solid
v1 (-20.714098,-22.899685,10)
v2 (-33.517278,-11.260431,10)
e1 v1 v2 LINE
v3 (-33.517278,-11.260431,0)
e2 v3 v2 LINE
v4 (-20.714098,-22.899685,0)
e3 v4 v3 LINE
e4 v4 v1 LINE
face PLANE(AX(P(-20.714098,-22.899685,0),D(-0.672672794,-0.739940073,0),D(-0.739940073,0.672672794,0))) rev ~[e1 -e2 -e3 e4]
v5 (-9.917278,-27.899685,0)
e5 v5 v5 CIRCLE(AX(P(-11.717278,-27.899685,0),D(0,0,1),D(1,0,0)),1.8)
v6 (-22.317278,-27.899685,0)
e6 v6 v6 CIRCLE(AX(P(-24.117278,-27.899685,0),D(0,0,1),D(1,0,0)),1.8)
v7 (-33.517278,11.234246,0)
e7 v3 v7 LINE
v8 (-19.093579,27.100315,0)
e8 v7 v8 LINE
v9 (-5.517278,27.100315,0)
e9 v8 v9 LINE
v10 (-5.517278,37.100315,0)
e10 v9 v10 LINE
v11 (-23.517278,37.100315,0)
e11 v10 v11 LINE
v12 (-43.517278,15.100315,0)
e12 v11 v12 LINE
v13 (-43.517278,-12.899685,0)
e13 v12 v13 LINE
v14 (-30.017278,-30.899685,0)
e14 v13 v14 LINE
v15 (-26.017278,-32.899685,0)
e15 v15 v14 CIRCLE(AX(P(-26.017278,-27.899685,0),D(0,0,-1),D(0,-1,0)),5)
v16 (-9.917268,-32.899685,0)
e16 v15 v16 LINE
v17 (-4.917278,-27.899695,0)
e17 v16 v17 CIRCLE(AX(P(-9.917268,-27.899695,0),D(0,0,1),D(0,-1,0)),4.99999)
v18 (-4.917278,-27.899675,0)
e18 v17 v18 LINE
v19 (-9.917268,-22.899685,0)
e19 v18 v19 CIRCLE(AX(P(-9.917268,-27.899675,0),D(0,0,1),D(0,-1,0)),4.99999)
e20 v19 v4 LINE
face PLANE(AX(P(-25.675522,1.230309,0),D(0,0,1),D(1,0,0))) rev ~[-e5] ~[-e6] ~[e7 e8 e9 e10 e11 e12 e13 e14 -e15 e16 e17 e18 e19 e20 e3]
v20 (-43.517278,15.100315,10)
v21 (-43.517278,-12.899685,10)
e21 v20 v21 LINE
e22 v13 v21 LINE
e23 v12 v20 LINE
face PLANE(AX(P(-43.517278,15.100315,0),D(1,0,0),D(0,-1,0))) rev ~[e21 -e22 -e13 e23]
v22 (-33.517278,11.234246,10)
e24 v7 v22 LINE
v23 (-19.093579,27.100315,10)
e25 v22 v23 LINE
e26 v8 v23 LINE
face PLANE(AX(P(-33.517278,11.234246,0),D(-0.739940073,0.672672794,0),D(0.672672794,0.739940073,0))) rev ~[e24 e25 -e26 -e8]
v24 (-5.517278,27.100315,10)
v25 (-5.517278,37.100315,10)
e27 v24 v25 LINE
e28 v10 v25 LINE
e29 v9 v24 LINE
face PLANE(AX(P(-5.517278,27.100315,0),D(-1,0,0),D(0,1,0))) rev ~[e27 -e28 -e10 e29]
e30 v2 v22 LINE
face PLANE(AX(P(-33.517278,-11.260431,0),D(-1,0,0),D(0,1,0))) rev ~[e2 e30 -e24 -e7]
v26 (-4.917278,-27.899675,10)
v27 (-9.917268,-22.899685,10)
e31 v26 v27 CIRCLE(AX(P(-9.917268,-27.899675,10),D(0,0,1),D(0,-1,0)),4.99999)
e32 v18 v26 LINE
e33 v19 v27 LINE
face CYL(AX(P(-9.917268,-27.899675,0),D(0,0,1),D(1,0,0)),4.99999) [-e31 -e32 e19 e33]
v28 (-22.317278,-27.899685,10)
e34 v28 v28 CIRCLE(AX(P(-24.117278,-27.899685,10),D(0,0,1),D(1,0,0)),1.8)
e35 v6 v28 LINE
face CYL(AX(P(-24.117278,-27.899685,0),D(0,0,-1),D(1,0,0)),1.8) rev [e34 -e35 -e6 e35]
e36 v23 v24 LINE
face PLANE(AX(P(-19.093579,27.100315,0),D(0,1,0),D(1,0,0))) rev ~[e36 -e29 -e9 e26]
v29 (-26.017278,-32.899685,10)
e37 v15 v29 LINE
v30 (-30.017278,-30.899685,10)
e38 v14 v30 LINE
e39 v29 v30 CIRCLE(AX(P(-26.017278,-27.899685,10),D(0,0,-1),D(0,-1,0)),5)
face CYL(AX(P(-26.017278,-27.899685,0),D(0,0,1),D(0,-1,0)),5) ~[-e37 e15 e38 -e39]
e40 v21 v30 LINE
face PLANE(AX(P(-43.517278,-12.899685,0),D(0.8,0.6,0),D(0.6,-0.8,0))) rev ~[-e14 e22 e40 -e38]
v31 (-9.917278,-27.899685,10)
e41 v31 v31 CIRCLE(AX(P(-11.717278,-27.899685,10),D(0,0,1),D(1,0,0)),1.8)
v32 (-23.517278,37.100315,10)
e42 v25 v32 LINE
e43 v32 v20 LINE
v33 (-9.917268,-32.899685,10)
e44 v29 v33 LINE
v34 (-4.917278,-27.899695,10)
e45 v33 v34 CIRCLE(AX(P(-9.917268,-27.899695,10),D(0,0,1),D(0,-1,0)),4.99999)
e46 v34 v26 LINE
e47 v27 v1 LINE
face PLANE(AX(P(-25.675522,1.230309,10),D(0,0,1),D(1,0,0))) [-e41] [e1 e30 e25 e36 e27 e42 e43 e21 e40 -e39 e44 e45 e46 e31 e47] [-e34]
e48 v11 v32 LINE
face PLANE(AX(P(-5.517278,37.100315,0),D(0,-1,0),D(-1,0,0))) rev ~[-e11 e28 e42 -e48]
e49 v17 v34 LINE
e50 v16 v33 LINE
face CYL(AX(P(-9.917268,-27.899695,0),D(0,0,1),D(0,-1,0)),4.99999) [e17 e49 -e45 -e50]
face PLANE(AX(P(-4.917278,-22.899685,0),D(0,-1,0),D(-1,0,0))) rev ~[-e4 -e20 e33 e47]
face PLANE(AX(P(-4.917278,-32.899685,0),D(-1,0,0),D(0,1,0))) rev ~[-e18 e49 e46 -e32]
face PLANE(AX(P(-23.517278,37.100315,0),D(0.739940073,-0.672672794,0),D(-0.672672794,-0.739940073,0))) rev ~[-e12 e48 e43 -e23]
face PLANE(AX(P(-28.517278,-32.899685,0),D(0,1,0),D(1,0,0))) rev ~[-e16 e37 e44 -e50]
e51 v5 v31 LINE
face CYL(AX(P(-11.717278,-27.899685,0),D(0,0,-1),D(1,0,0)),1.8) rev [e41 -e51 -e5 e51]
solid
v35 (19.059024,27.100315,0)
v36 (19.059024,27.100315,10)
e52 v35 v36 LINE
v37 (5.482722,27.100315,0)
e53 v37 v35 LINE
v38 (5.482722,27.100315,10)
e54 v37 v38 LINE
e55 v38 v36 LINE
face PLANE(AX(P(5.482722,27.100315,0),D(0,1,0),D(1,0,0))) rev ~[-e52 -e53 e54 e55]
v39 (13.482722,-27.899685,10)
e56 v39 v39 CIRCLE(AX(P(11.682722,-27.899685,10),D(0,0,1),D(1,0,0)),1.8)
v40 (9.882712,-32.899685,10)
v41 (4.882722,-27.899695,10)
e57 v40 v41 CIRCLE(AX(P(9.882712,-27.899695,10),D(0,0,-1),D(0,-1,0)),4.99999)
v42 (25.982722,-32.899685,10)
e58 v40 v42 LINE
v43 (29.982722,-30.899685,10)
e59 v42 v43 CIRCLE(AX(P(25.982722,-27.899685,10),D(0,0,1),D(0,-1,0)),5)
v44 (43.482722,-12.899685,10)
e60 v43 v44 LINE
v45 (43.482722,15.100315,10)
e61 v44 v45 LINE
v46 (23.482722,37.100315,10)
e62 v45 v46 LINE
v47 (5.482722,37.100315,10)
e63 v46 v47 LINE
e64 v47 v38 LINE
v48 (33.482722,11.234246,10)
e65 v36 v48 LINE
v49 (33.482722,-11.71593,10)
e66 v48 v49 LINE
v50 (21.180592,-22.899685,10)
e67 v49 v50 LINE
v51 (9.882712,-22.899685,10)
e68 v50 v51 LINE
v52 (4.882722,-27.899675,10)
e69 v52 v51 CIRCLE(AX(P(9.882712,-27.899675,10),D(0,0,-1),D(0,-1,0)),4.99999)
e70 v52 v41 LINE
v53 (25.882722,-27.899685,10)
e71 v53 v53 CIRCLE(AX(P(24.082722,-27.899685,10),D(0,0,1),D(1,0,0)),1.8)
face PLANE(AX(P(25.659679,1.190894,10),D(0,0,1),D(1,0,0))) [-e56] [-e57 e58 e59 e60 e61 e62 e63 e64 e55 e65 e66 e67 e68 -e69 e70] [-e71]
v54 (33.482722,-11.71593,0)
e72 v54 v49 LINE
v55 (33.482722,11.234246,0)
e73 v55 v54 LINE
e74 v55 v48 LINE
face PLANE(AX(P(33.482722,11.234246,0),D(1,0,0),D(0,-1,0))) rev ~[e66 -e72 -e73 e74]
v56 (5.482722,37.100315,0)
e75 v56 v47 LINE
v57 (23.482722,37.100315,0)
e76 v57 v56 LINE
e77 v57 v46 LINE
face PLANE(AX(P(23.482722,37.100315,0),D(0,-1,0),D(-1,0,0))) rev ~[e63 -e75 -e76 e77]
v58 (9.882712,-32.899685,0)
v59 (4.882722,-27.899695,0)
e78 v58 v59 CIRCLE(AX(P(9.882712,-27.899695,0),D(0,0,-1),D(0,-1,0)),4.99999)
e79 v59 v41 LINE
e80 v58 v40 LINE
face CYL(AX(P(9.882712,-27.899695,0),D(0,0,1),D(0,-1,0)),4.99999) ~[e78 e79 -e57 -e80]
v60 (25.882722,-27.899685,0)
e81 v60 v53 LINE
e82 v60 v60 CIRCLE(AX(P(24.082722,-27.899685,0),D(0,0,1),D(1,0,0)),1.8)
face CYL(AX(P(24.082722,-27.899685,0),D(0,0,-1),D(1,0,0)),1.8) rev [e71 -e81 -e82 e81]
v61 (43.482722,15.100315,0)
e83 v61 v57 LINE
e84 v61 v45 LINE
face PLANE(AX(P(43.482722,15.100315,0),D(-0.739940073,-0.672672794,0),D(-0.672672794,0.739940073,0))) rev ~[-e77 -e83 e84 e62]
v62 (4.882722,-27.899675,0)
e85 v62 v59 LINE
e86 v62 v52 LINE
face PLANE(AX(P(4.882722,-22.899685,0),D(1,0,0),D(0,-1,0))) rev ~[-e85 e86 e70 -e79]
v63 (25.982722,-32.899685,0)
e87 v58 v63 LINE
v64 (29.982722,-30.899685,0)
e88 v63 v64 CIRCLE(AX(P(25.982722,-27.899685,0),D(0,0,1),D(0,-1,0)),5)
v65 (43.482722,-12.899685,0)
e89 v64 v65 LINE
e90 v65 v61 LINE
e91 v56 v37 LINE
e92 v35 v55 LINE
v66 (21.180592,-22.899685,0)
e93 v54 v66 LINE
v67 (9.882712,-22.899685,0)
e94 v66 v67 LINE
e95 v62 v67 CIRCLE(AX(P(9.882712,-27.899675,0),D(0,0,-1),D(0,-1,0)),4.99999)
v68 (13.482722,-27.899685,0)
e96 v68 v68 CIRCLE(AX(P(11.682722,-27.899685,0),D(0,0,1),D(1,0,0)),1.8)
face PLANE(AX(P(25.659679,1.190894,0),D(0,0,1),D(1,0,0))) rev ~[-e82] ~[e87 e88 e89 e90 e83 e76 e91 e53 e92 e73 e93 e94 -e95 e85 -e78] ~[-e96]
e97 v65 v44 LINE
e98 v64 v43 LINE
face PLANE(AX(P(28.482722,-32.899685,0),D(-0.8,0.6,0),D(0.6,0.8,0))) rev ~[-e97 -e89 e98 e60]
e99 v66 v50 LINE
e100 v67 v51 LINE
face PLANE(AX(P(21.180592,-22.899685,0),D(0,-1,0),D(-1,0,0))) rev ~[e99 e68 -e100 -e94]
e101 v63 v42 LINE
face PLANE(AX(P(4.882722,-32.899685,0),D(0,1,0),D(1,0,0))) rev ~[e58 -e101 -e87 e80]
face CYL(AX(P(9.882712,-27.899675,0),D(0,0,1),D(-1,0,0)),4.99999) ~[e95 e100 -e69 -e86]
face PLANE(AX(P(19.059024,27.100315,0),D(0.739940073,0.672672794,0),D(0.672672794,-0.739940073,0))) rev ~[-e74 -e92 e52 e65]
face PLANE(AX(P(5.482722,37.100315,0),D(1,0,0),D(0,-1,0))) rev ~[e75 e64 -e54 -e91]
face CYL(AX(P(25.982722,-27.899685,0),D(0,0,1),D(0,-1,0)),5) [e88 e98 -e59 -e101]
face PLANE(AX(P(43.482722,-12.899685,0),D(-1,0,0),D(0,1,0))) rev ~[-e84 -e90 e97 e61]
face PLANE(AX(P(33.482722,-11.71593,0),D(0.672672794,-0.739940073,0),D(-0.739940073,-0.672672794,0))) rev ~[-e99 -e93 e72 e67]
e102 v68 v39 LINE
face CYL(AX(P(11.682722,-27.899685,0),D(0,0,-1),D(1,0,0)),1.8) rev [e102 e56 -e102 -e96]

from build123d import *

# Parameters (mm, degrees)
F0_R     = 1.8
F1_DEPTH = 10
F2_R     = 4.99999
F2_2_R   = 4.99999
F3_R     = 5
F3_2_R   = 5


# Not quite as in the source:
# - a fillet or chamfer is up to 0.001 mm smaller than in the source, because OpenCascade refuses the exact size


with BuildPart() as f1:
    # F0 (on Top) → F1 (new body)
    with BuildSketch(Plane.XY):
        Polygon((4.8827224633, -32.8996852207), (28.4827224633, -32.8996852207), (43.4827224633, -12.8996852207), (43.4827224633, 15.1003147793), (23.4827224633, 37.1003147793), (5.4827224633, 37.1003147793), (5.4827224633, 27.1003147793), (19.0590236021, 27.1003147793), (33.4827224633, 11.234246032), (33.4827224633, -11.7159301209), (21.1805918535, -22.8996852207), (4.8827224633, -22.8996852207), align=None)
        with Locations((11.6827224633, -27.8996852207)):
            Circle(F0_R, mode=Mode.SUBTRACT)
        with Locations((24.0827224633, -27.8996852207)):
            Circle(F0_R, mode=Mode.SUBTRACT)
    extrude(amount=F1_DEPTH)

    # F2#2 (radius 5 in the source; OpenCascade refuses exactly that, so slightly less here)
    f2_2_edges = [f1.edges().sort_by_distance(p)[0] for p in [
        (4.882722, -22.899685, 5),
        (4.882722, -32.899685, 5),
    ]]
    fillet(f2_2_edges, radius=F2_2_R)

    # F3#2
    f3_2_edges = [f1.edges().sort_by_distance(p)[0] for p in [
        (28.482722, -32.899685, 5),
    ]]
    fillet(f3_2_edges, radius=F3_2_R)


with BuildPart() as f1b:
    # F0 (on Top) → F1, piece 2 (new body)
    with BuildSketch(Plane.XY):
        Polygon((-43.5172775367, 15.1003147793), (-43.5172775367, -12.8996852207), (-28.5172775367, -32.8996852207), (-4.9172775367, -32.8996852207), (-4.9172775367, -22.8996852207), (-20.7140983621, -22.8996852207), (-33.5172775367, -11.2604314256), (-33.5172775367, 11.234246032), (-19.0935786755, 27.1003147793), (-5.5172775367, 27.1003147793), (-5.5172775367, 37.1003147793), (-23.5172775367, 37.1003147793), align=None)
        with Locations((-24.1172775367, -27.8996852207)):
            Circle(F0_R, mode=Mode.SUBTRACT)
        with Locations((-11.7172775367, -27.8996852207)):
            Circle(F0_R, mode=Mode.SUBTRACT)
    extrude(amount=F1_DEPTH)

    # F2 (radius 5 in the source; OpenCascade refuses exactly that, so slightly less here)
    f2_edges = [f1b.edges().sort_by_distance(p)[0] for p in [
        (-4.917278, -32.899685, 5),
        (-4.917278, -22.899685, 5),
    ]]
    fillet(f2_edges, radius=F2_R)

    # F3
    f3_edges = [f1b.edges().sort_by_distance(p)[0] for p in [
        (-28.517278, -32.899685, 5),
    ]]
    fillet(f3_edges, radius=F3_R)


solid = Compound([f1.part, f1b.part])
